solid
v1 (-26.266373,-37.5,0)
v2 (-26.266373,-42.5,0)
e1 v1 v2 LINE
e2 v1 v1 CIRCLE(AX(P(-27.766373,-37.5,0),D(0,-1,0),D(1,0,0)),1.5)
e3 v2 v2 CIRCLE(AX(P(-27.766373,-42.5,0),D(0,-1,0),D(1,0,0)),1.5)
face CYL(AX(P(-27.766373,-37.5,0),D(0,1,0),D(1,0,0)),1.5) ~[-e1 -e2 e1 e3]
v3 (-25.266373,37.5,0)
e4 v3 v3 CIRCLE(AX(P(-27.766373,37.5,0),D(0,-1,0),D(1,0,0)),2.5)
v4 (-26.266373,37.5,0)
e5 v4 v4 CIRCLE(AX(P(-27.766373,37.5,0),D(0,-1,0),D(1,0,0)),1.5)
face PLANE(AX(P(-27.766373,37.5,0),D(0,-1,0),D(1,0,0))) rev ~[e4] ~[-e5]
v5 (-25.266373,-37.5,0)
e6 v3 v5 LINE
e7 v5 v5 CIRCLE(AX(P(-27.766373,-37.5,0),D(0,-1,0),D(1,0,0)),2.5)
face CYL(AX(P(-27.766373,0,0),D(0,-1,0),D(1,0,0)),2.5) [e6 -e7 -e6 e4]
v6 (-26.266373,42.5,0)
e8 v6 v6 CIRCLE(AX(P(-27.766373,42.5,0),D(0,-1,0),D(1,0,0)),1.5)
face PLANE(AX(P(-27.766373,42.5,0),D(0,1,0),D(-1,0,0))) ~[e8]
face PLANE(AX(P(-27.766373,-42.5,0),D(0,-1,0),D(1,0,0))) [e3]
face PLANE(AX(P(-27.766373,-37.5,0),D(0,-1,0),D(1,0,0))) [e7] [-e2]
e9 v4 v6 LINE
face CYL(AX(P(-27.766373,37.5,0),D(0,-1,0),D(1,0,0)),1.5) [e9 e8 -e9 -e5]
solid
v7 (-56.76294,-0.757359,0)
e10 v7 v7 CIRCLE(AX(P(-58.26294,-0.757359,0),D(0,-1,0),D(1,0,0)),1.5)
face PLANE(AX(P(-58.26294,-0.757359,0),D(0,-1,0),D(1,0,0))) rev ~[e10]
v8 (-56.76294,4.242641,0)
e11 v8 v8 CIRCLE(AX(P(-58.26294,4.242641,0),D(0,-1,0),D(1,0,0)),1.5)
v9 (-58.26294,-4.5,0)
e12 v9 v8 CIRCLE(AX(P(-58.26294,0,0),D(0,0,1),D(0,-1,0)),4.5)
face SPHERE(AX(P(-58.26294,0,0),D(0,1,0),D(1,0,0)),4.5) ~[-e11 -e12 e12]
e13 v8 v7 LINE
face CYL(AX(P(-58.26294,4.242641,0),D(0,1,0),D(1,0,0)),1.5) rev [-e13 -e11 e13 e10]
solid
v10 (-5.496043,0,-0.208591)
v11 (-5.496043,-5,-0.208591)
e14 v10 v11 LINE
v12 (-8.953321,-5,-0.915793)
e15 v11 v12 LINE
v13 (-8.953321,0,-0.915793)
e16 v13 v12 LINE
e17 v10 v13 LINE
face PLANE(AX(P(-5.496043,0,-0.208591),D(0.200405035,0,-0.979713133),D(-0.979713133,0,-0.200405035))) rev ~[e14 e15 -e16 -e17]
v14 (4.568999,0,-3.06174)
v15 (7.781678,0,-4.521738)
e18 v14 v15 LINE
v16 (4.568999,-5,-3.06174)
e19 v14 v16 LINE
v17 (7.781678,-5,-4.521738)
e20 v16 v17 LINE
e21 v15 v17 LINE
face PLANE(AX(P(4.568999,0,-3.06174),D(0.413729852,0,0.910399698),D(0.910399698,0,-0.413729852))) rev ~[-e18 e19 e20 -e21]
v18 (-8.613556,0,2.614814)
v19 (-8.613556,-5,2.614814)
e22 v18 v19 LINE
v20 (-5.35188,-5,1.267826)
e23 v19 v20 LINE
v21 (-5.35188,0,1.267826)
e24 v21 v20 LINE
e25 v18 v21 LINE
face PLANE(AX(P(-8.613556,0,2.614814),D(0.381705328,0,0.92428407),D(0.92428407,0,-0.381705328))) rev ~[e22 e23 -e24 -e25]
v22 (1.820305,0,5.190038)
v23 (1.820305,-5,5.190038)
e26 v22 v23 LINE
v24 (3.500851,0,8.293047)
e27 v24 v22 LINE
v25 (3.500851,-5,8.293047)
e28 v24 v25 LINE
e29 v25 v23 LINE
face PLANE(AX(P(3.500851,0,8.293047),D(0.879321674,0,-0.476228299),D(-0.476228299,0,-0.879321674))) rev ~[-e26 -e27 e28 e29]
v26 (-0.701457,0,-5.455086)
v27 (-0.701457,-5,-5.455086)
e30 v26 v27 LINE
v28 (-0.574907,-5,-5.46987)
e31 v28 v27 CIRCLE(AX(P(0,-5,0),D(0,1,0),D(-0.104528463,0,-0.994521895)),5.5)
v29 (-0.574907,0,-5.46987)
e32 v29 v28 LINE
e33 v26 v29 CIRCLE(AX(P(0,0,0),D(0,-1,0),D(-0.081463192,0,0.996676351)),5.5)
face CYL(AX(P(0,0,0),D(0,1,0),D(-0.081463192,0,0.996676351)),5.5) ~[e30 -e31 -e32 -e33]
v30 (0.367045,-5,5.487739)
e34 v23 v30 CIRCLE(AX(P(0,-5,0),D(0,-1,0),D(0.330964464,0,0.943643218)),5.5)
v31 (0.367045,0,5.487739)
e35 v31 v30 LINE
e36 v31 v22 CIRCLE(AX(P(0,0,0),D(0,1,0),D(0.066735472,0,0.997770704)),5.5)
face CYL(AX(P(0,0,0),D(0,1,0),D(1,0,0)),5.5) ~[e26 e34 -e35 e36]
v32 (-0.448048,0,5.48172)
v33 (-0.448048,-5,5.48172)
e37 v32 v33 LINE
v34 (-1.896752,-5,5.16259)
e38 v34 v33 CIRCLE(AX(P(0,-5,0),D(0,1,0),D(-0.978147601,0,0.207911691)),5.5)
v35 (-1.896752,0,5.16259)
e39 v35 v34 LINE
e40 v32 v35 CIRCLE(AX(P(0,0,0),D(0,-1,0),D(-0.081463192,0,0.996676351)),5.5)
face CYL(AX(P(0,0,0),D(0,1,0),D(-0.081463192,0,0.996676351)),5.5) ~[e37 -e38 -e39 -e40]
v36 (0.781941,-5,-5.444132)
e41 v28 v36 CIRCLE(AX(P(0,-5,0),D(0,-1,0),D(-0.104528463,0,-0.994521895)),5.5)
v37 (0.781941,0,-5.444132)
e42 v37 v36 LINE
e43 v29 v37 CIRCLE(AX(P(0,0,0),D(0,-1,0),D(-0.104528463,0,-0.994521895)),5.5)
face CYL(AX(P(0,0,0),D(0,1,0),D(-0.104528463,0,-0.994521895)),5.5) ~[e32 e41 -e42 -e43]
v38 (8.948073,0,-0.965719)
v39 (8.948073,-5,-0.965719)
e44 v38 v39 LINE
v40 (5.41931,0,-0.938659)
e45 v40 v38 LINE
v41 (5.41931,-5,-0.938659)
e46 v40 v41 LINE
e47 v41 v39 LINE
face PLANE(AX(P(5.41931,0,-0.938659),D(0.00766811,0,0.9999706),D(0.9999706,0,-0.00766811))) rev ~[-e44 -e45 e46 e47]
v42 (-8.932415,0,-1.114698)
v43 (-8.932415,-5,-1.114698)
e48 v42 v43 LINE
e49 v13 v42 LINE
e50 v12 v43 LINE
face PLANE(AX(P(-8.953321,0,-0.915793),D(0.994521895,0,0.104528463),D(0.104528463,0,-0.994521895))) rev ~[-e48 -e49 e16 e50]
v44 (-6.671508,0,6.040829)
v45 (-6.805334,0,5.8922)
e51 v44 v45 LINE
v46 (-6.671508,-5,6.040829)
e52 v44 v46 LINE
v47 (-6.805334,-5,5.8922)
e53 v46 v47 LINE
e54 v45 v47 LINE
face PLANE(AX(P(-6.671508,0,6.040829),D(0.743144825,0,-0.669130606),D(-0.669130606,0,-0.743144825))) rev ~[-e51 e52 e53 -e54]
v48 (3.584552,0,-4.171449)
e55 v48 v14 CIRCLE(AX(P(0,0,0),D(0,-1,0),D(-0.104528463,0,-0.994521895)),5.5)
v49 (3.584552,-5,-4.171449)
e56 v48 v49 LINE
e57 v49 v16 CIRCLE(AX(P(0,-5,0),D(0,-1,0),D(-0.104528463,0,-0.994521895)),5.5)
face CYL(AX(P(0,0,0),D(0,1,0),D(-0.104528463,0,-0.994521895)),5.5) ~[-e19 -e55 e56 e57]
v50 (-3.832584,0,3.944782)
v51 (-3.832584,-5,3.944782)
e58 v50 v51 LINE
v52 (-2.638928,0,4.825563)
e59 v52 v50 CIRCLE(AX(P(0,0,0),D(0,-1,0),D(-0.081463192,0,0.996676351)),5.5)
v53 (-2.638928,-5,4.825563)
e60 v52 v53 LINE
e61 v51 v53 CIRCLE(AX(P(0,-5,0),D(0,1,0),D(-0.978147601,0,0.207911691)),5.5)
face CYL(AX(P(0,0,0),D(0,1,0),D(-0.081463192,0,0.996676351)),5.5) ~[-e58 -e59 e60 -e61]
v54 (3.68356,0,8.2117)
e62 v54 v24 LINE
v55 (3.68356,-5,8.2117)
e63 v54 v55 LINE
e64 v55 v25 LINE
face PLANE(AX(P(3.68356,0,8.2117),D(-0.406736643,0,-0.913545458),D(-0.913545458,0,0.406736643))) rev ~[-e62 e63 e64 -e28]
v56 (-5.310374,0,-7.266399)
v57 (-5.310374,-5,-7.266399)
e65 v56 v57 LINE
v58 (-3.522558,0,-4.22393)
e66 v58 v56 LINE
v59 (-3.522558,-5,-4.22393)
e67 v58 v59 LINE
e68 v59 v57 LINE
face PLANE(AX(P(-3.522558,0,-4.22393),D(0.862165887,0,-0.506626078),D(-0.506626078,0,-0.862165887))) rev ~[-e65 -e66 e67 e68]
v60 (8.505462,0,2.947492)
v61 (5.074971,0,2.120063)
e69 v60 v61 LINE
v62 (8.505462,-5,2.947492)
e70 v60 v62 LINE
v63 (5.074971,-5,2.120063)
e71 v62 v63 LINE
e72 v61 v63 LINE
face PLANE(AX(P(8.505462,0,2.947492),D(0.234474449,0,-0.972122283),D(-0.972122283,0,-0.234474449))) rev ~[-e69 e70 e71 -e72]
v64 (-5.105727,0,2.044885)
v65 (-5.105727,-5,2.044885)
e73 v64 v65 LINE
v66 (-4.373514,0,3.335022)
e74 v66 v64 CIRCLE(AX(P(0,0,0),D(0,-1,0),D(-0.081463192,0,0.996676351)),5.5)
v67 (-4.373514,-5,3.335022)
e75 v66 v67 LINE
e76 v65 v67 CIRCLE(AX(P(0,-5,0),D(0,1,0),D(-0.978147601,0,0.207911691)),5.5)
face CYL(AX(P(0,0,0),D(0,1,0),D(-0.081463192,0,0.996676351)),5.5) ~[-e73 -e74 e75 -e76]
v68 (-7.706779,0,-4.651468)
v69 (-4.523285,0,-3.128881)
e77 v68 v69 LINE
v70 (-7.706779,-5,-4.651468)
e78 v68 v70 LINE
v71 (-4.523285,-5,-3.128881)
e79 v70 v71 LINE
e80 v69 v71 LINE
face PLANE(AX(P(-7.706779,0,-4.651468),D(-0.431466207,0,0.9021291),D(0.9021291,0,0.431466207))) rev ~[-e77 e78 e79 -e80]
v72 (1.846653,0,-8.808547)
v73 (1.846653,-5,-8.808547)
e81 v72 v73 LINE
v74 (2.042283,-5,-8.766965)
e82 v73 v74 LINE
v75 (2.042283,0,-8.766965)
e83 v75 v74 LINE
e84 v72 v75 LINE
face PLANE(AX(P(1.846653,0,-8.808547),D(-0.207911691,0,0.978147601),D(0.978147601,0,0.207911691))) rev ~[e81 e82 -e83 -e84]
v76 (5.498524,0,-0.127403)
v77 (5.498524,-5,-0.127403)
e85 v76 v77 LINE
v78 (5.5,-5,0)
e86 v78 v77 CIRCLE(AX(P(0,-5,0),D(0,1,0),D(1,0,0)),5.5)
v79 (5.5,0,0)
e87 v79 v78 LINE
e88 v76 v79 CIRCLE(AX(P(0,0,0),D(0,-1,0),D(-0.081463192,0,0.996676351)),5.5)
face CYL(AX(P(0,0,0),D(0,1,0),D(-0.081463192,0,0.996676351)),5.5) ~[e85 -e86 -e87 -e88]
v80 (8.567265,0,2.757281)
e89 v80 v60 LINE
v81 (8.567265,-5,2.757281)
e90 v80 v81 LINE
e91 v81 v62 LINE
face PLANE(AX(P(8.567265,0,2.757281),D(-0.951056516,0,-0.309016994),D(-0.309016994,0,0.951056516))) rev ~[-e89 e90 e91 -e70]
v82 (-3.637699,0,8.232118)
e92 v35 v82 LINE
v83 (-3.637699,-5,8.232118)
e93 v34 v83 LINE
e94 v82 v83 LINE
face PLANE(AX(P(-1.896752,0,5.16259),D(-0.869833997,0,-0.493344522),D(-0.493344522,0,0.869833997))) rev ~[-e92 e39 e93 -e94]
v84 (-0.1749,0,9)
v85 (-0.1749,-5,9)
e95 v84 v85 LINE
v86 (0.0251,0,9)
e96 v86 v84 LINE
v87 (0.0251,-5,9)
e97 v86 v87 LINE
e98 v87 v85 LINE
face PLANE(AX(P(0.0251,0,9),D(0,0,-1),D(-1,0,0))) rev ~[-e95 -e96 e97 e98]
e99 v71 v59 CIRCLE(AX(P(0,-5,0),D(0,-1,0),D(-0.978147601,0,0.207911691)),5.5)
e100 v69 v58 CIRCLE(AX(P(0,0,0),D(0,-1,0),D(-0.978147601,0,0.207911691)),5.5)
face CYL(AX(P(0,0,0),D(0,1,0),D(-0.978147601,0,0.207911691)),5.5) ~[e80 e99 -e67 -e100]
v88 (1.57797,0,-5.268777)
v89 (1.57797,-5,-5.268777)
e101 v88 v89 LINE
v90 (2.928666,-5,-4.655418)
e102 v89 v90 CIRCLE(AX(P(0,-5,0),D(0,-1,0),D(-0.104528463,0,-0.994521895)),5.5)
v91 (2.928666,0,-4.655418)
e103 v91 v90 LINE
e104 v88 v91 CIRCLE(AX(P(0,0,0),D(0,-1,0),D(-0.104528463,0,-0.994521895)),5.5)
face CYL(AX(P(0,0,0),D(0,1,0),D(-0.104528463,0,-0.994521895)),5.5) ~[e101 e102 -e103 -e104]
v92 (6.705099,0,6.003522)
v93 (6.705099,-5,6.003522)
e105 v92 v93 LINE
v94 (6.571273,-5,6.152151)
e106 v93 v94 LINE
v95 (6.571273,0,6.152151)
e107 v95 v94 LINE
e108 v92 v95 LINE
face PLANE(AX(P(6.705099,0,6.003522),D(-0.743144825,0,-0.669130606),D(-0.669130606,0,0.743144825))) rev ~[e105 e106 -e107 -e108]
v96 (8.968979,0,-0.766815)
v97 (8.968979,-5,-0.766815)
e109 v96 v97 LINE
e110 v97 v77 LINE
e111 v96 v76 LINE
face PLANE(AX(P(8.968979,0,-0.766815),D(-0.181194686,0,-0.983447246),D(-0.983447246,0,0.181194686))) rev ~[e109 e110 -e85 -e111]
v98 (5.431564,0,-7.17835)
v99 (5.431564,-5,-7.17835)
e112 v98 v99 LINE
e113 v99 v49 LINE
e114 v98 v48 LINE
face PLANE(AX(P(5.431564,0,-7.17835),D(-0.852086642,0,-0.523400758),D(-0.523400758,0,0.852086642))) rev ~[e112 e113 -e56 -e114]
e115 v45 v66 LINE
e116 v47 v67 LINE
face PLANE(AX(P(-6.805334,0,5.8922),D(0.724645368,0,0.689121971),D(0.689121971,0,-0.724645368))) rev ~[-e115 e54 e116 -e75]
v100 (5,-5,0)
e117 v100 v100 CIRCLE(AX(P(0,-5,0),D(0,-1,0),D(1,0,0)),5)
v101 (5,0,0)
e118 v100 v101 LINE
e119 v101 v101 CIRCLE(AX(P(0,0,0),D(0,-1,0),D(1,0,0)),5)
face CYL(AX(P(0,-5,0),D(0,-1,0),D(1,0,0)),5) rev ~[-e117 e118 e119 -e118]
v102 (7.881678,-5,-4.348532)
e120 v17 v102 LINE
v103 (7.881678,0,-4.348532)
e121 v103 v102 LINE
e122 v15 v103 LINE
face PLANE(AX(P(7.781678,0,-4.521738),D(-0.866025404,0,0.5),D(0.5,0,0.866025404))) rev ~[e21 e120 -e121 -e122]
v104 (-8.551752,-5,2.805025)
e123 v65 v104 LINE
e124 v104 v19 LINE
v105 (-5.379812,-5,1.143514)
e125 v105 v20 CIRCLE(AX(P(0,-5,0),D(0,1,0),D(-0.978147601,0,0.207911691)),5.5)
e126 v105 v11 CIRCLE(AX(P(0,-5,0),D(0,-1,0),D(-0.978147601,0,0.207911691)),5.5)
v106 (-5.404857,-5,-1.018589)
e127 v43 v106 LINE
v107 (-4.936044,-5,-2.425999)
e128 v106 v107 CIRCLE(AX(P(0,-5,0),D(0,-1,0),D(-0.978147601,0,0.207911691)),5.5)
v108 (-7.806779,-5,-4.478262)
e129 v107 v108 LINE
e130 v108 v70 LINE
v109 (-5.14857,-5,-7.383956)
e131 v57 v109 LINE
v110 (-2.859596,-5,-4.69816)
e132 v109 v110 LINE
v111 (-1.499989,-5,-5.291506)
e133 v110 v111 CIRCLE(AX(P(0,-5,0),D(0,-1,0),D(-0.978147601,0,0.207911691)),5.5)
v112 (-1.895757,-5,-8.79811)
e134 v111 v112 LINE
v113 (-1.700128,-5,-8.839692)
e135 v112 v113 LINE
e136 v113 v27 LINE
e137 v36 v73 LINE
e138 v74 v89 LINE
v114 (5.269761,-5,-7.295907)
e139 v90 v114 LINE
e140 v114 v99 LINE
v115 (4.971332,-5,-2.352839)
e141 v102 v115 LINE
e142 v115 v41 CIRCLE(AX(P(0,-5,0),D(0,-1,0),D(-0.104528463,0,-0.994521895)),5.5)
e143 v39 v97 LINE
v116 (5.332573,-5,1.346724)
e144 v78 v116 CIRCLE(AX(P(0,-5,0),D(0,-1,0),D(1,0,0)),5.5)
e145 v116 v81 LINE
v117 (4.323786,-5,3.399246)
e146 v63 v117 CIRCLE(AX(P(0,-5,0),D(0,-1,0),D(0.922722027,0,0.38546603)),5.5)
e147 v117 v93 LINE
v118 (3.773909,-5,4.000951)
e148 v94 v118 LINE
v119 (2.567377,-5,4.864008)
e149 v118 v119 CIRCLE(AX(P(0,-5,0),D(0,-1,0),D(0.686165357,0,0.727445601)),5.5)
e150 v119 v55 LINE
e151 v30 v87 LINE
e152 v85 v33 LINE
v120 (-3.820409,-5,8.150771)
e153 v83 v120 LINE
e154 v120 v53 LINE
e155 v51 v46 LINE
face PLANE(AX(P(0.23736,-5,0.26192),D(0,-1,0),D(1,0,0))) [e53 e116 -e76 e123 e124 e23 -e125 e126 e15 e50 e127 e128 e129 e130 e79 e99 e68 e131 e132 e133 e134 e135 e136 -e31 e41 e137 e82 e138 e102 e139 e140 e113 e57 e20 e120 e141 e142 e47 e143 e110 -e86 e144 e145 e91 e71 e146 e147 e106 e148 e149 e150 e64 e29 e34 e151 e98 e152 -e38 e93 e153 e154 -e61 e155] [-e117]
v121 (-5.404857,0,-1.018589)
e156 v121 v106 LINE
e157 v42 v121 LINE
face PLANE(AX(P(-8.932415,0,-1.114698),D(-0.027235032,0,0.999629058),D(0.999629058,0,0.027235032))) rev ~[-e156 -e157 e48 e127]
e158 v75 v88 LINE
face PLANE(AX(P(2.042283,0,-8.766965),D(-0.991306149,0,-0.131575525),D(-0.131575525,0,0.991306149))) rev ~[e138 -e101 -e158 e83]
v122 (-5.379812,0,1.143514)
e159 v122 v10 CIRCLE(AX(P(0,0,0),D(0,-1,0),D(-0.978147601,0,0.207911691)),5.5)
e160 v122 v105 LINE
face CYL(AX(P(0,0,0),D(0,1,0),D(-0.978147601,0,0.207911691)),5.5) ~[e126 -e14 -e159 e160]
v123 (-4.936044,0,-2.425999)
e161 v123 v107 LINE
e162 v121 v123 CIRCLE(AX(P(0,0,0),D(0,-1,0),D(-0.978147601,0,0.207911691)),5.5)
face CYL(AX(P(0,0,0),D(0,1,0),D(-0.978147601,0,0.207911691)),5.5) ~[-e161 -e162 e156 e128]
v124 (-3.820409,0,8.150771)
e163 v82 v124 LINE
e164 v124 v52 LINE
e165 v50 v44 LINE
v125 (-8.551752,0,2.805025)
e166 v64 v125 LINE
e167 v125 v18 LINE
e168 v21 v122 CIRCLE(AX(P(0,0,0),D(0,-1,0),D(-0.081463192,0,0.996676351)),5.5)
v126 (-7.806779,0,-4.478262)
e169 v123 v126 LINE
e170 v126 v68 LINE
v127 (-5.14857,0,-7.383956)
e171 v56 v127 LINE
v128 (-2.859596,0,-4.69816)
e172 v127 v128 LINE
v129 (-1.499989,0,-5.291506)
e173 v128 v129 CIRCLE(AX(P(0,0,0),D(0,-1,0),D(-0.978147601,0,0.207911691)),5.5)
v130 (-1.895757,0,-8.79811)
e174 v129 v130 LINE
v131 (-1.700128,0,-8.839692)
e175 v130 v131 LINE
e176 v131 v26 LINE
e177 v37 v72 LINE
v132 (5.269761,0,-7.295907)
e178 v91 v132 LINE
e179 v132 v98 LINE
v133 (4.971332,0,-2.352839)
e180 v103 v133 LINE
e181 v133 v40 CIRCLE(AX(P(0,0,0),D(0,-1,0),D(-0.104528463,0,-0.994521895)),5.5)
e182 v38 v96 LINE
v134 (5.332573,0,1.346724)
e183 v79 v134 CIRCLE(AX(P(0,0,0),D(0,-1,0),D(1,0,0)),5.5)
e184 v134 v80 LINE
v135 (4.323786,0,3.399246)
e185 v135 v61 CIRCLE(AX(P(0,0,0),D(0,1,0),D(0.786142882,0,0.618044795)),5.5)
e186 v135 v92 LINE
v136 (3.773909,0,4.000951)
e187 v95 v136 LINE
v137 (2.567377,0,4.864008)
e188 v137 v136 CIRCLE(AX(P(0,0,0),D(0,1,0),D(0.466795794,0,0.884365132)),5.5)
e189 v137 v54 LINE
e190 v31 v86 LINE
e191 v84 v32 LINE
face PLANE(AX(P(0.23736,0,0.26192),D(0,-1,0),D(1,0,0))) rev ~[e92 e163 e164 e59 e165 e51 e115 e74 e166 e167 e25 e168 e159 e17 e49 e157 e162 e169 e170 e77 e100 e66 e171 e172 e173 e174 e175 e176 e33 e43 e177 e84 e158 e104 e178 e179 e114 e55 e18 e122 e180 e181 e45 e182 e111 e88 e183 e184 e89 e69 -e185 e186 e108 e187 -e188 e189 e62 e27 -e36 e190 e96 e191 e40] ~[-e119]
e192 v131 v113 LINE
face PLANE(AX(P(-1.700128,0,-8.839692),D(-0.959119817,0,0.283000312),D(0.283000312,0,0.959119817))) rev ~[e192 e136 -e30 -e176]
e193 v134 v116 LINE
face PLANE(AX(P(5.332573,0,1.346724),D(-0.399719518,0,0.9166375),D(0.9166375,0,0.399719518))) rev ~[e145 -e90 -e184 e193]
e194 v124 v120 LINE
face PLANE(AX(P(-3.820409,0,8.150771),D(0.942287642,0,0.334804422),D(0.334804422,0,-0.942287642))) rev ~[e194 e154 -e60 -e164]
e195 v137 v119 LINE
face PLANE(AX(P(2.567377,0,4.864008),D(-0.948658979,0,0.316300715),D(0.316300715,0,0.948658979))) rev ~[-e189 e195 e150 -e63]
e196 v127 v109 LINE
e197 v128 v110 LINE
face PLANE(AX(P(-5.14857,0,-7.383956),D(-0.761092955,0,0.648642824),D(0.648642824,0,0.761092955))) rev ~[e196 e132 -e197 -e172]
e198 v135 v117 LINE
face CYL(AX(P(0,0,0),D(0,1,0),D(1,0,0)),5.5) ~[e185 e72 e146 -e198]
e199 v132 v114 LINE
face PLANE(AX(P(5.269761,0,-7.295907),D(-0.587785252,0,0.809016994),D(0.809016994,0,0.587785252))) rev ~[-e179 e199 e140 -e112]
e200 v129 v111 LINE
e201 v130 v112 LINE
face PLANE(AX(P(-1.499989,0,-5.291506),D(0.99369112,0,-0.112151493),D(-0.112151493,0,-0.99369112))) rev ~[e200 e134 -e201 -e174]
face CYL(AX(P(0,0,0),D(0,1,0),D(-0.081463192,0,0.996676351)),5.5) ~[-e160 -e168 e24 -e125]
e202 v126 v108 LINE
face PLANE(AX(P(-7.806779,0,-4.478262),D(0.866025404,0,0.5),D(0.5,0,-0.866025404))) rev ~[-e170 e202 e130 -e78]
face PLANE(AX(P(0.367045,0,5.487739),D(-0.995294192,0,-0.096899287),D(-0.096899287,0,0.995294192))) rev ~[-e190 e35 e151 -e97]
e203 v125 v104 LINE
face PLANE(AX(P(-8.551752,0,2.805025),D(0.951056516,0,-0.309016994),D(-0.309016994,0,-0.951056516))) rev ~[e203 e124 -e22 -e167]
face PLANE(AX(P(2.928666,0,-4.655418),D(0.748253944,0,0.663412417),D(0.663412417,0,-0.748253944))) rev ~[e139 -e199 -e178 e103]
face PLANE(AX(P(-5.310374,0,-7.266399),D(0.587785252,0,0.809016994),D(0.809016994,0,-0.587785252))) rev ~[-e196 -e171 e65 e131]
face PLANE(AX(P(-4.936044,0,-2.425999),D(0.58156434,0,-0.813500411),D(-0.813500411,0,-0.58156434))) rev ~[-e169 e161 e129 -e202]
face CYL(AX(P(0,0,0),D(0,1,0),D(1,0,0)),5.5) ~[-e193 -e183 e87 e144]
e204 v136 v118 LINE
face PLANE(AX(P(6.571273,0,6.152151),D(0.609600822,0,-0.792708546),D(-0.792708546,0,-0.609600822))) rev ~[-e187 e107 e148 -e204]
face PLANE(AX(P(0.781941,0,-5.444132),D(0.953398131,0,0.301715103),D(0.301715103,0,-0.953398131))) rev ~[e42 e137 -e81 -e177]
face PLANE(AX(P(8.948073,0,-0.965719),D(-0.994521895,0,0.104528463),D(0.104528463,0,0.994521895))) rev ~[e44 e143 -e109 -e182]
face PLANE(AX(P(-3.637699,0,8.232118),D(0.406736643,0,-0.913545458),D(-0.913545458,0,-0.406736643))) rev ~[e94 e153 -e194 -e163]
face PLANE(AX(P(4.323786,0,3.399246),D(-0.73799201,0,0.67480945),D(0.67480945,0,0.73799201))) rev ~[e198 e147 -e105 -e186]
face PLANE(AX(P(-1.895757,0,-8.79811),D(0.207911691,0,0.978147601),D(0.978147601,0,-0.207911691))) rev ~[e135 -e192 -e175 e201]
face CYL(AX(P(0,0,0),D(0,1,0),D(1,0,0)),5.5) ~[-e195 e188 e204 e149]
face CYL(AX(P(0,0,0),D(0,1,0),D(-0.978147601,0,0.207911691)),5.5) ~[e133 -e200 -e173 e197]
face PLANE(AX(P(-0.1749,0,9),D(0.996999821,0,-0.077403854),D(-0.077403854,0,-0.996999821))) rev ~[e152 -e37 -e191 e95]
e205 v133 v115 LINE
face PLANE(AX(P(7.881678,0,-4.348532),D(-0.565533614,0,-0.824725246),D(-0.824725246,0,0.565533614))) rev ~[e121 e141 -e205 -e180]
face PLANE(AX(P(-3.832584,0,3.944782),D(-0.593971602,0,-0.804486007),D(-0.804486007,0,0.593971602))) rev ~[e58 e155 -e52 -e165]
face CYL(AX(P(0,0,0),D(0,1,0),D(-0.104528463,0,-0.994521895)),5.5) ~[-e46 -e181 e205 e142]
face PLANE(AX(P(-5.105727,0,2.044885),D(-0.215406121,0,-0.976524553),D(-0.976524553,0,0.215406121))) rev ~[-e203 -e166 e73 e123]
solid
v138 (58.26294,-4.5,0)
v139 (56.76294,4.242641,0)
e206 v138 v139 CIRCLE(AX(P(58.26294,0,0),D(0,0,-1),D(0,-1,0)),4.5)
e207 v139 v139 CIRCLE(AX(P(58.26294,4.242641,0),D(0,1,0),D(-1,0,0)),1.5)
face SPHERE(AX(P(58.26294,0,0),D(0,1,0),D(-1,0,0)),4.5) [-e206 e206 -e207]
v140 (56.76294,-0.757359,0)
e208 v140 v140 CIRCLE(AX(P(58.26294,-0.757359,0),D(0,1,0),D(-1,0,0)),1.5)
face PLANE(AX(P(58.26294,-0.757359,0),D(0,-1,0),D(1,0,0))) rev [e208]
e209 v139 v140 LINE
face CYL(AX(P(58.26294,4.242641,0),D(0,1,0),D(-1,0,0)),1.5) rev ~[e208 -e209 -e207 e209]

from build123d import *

# Parameters (mm, degrees)
F1_DEPTH        = 5
F1_COPIES_COUNT = 15
F3_R            = 5
F4_DEPTH        = 25
F5_R            = 2.5
F6_DEPTH        = 37.5
F7_R            = 1.5
F8_DEPTH        = 5
F12_DEPTH       = 5


# Not quite as in the source:
# - a feature of the source that left no trace in its solid (it failed there, or was rolled back) is left out
# - a pattern or mirror of a feature is missing from the dataset's text; its kind, count and spacing are read off the source's solid


with BuildPart() as f1:
    # F0 (on Front) → F1 (new body)
    with BuildSketch(Plane.XZ):
        with BuildLine():
            ThreePointArc((-0.4480475583, 5.4817199295), (-3.727313941, -4.0443949838), (5.5, 0))
            ThreePointArc((5.5, 0), (4.0167616325, 3.7570767876), (0.3670450953, 5.4877388693))
            ThreePointArc((0.3670450953, 5.4877388693), (-0.0406128879, 5.4998500519), (-0.4480475583, 5.4817199295))
        make_face()
        with BuildLine():
            ThreePointArc((-0.4480475583, 5.4817199295), (-0.0406128879, 5.4998500519), (0.3670450953, 5.4877388693))
            Line((0.3670450953, 5.4877388693), (0.02510037, 9))
            Line((0.02510037, 9), (-0.17489963, 9))
            Line((-0.17489963, 9), (-0.4480475583, 5.4817199295))
        make_face()
    extrude(amount=F1_DEPTH)

    # F1_copies: F1 ×15 about axis
    f1_copies_axis = Axis((0, 0, 0), (0, 1, 0))


with BuildPart() as f1_1:
    add(f1.part)
    for i in range(1, F1_COPIES_COUNT):
        add(f1.part.rotate(f1_copies_axis, i * 360 / F1_COPIES_COUNT))

    # F3 (on face) → F4 (cut)
    with BuildSketch(Plane.XZ.offset(5)):
        Circle(F3_R)
    extrude(amount=-F4_DEPTH, mode=Mode.SUBTRACT)


with BuildPart() as f6:
    # F5 (on Front) → F6 (new body, symmetric)
    with BuildSketch(Plane.XZ):
        with Locations((-27.7663727778, 0)):
            Circle(F5_R)
    extrude(amount=F6_DEPTH, both=True)

    # F7 (on face) → F8 (join)
    with BuildSketch(Plane.XZ.offset(37.5)):
        with Locations((-27.7663727778, 0)):
            Circle(F7_R)
    extrude(amount=F8_DEPTH)

    # F9: F6 across plane


with BuildPart() as f6_1:
    add(f6.part)
    add(f6.part.mirror(Plane.XZ))


with BuildPart() as f11:
    # F10 (on Top) → F11 (revolve)
    with BuildSketch(Plane.XY):
        with BuildLine():
            Line((-58.2629402318, 0), (-58.2629402318, -4.5))
            ThreePointArc((-58.2629402318, -4.5), (-53.8277467134, -0.7609589043), (-56.7629402318, 4.2426406871))
            Line((-56.7629402318, 4.2426406871), (-58.2629402318, 4.2426406871))
            Line((-58.2629402318, 4.2426406871), (-58.2629402318, 0))
        make_face()
    revolve(axis=Axis((-58.2629402318, -2.25, 0), (0, -1, 0)))

    # F12 (cut): a face of the model
    f12_faces = [f11.faces().sort_by_distance(p)[0] for p in [
        (-58.2629402318, 4.2426406871, 0),
    ]]
    extrude(f12_faces, amount=-F12_DEPTH, mode=Mode.SUBTRACT)


with BuildPart() as f13_1:
    # F13: instance of F11
    add(f11.part.mirror(Plane.YZ))


solid = Compound([f1_1.part, f6_1.part, f11.part, f13_1.part])
